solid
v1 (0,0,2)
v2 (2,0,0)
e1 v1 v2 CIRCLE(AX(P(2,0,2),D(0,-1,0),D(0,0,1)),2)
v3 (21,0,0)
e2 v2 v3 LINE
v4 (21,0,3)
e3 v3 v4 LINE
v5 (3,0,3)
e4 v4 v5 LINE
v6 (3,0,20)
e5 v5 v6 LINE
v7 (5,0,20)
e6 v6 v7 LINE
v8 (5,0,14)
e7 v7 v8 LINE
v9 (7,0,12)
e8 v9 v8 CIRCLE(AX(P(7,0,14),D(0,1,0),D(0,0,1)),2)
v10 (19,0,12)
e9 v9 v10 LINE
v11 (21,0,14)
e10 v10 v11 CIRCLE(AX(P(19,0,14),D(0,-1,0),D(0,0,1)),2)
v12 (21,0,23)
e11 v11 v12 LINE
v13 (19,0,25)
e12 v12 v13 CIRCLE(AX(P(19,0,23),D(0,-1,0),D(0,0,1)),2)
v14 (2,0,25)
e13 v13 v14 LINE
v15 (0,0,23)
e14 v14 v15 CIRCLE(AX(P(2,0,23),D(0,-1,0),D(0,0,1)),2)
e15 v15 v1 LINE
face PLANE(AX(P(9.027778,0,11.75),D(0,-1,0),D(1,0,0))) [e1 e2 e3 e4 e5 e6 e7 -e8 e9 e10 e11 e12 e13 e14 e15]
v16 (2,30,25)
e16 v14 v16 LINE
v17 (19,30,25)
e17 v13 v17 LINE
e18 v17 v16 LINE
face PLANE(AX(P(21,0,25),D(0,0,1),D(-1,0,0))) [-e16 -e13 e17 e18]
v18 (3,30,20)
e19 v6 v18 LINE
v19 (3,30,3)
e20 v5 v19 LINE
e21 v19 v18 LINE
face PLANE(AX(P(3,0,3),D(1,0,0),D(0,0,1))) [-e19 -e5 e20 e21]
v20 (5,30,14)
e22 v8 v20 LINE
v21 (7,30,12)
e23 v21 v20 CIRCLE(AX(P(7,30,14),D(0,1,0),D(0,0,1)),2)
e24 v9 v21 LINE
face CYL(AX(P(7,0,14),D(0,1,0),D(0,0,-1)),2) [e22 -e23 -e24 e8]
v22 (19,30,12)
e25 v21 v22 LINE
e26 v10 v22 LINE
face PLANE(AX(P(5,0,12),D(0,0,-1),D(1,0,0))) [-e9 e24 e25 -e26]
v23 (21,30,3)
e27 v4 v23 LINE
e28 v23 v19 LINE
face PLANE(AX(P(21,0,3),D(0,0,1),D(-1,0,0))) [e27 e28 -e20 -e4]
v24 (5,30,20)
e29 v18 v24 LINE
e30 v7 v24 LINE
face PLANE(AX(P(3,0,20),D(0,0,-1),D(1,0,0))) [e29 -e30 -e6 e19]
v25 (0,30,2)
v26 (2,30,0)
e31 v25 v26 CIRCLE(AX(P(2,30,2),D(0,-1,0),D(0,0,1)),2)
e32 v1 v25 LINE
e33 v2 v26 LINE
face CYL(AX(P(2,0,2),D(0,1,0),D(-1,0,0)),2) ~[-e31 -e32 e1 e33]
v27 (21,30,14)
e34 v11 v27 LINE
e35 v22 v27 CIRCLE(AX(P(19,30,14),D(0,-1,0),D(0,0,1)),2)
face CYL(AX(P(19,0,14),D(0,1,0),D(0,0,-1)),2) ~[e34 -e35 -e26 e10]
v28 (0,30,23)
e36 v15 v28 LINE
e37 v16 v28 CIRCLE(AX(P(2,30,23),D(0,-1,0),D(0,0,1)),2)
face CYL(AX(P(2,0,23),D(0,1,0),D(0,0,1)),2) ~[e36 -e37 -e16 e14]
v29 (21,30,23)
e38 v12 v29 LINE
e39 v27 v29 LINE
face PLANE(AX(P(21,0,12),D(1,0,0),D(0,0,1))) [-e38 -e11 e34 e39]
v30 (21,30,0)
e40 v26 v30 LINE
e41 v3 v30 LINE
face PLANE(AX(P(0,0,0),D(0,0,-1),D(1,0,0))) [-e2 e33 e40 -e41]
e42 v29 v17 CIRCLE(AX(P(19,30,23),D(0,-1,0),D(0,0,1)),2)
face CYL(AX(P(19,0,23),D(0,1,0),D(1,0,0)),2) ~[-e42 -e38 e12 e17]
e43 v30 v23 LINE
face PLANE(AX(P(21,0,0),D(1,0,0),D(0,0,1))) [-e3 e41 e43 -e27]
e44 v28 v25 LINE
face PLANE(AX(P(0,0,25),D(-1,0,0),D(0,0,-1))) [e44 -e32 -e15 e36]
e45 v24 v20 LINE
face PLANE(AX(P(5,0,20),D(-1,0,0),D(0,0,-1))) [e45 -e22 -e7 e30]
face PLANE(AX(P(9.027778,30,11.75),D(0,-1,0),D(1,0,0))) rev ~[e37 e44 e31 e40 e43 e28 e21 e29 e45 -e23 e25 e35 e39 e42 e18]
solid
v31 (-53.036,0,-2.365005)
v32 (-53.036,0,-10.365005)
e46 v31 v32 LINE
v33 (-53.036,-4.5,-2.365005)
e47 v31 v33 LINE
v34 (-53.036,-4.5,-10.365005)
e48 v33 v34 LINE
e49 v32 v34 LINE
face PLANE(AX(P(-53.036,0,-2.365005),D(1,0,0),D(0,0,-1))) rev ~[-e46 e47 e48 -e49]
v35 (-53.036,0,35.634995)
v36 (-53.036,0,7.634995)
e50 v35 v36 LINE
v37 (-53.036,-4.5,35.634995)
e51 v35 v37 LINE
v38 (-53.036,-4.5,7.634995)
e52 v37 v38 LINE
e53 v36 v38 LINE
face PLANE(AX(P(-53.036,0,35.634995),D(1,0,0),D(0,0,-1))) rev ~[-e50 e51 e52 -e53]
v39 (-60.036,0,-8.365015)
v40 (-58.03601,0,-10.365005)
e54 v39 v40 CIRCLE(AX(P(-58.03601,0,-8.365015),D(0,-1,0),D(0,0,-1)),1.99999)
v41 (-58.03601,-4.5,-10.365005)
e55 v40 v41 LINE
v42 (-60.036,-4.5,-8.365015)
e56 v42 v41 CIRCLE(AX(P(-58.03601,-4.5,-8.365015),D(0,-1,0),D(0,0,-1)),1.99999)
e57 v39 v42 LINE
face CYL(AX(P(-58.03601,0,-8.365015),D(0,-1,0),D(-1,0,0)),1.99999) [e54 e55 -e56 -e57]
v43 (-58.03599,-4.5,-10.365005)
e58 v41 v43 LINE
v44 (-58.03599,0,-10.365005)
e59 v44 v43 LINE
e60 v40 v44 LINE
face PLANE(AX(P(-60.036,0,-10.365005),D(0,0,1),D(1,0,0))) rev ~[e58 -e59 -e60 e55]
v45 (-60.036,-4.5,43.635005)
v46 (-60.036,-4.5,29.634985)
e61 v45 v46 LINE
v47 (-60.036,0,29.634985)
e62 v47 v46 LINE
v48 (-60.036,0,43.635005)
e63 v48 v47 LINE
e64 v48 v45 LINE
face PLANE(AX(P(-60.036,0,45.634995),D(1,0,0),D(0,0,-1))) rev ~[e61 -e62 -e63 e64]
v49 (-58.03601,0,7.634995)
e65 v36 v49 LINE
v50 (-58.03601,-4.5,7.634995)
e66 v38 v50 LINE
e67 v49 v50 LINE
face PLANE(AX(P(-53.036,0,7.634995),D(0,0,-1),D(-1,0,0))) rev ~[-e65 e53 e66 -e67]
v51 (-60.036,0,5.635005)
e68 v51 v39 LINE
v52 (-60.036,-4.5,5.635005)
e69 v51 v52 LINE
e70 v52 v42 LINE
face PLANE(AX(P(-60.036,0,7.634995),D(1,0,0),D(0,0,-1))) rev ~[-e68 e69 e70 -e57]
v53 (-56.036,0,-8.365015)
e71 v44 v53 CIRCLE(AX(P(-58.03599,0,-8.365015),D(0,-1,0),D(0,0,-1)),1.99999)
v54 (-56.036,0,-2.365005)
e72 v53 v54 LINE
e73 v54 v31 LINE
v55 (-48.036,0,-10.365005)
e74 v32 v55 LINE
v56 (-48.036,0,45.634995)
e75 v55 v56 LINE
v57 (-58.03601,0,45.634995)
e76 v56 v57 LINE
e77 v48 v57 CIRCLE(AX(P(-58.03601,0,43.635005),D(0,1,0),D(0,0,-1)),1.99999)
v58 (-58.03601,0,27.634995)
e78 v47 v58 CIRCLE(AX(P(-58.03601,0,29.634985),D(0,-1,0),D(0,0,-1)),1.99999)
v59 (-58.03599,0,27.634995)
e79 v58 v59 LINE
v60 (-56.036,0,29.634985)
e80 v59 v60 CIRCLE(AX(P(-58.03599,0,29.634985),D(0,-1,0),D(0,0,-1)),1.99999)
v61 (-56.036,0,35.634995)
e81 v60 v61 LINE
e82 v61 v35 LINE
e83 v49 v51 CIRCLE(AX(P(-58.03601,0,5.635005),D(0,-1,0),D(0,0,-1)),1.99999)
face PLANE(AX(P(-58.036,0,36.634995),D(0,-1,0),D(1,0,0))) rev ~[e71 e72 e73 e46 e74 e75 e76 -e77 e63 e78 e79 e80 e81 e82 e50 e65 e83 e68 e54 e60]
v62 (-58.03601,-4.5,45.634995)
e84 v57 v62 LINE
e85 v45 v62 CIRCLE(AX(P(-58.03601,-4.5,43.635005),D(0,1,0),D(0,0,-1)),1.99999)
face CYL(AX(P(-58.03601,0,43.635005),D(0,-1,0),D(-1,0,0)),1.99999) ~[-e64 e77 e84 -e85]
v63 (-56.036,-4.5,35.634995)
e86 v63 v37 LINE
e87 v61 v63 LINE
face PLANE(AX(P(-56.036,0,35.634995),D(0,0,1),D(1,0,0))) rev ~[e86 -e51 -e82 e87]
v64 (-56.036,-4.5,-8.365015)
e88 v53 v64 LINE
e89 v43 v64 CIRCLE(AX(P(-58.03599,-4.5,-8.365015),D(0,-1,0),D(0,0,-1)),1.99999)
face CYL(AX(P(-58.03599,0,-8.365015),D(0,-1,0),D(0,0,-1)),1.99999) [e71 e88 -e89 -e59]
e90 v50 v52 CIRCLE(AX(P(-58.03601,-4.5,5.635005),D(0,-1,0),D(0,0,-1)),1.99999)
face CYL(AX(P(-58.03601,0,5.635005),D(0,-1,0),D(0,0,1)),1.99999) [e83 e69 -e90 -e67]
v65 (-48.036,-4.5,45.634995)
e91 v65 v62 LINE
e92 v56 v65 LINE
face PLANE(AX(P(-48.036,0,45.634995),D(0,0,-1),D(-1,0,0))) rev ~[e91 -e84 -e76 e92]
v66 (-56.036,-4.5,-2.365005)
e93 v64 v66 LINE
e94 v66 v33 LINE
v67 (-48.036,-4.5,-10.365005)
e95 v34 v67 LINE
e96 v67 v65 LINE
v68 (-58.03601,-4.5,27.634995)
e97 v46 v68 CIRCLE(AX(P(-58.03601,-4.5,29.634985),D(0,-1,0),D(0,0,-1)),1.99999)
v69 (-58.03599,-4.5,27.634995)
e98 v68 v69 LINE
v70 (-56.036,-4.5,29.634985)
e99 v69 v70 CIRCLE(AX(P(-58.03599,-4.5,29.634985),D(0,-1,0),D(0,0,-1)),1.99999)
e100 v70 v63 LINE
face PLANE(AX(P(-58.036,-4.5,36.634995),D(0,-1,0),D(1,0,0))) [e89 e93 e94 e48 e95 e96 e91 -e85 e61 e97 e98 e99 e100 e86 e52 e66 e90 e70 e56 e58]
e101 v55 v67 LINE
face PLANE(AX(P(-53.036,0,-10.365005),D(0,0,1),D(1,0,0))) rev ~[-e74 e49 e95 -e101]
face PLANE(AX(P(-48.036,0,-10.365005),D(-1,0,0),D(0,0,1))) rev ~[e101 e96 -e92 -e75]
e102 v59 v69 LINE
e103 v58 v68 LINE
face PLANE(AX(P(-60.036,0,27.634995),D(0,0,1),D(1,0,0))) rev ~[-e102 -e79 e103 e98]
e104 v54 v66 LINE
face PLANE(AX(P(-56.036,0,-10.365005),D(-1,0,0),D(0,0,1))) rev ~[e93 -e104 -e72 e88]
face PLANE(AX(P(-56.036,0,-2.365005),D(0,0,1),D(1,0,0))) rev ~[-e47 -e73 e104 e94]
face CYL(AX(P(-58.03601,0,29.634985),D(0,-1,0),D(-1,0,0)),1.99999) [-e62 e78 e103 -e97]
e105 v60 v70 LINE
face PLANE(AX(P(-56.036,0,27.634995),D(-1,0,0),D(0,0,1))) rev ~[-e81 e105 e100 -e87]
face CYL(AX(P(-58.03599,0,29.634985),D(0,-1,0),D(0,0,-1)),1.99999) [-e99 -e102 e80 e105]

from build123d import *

# Parameters (mm, degrees)
F1_DEPTH = 30
F2_R     = 2
F3_W     = 3
F3_H     = 10
F4_DEPTH = 4.5
F6_R     = 1.99999


# Not quite as in the source:
# - a fillet or chamfer is up to 0.001 mm smaller than in the source, because OpenCascade refuses the exact size


with BuildPart() as f1:
    # F0 (on Front) → F1 (new body)
    with BuildSketch(Plane.XZ):
        Polygon((5, 12), (21, 12), (21, 25), (0, 25), (0, 0), (21, 0), (21, 3), (3, 3), (3, 20), (5, 20), align=None)
    extrude(amount=-F1_DEPTH)

    # F2
    f2_edges = [f1.edges().sort_by_distance(p)[0] for p in [
        (21, 15, 25),
        (0, 15, 25),
        (21, 15, 12),
        (0, 15, 0),
        (5, 15, 12),
    ]]
    fillet(f2_edges, radius=F2_R)


with BuildPart() as f4:
    # F3 (on Front) → F4 (new body)
    with BuildSketch(Plane.XZ):
        Polygon((-56.0359997153, 45.6349952309), (-60.0359997153, 45.6349952309), (-60.0359997153, 27.6349952309), (-56.0359997153, 27.6349952309), (-56.0359997153, 35.6349952309), align=None)
        with Locations((-54.5359997153, 40.6349952309)):
            Rectangle(F3_W, F3_H)
        Polygon((-48.0359997153, 45.6349952309), (-53.0359997153, 45.6349952309), (-53.0359997153, 35.6349952309), (-53.0359997153, 7.6349952309), (-53.0359997153, -2.3650047691), (-53.0359997153, -10.3650047691), (-48.0359997153, -10.3650047691), align=None)
        with Locations((-54.5359997153, 2.6349952309)):
            Rectangle(F3_W, F3_H)
        Polygon((-56.0359997153, -2.3650047691), (-56.0359997153, 7.6349952309), (-60.0359997153, 7.6349952309), (-60.0359997153, -10.3650047691), (-56.0359997153, -10.3650047691), align=None)
    extrude(amount=F4_DEPTH)

    # F6 (radius 2 in the source; OpenCascade refuses exactly that, so slightly less here)
    f6_edges = [f4.edges().sort_by_distance(p)[0] for p in [
        (-56.036, -2.25, -10.365005),
        (-60.036, -2.25, -10.365005),
        (-60.036, -2.25, 7.634995),
        (-60.036, -2.25, 27.634995),
        (-56.036, -2.25, 27.634995),
        (-60.036, -2.25, 45.634995),
    ]]
    fillet(f6_edges, radius=F6_R)


solid = Compound([f1.part, f4.part])
